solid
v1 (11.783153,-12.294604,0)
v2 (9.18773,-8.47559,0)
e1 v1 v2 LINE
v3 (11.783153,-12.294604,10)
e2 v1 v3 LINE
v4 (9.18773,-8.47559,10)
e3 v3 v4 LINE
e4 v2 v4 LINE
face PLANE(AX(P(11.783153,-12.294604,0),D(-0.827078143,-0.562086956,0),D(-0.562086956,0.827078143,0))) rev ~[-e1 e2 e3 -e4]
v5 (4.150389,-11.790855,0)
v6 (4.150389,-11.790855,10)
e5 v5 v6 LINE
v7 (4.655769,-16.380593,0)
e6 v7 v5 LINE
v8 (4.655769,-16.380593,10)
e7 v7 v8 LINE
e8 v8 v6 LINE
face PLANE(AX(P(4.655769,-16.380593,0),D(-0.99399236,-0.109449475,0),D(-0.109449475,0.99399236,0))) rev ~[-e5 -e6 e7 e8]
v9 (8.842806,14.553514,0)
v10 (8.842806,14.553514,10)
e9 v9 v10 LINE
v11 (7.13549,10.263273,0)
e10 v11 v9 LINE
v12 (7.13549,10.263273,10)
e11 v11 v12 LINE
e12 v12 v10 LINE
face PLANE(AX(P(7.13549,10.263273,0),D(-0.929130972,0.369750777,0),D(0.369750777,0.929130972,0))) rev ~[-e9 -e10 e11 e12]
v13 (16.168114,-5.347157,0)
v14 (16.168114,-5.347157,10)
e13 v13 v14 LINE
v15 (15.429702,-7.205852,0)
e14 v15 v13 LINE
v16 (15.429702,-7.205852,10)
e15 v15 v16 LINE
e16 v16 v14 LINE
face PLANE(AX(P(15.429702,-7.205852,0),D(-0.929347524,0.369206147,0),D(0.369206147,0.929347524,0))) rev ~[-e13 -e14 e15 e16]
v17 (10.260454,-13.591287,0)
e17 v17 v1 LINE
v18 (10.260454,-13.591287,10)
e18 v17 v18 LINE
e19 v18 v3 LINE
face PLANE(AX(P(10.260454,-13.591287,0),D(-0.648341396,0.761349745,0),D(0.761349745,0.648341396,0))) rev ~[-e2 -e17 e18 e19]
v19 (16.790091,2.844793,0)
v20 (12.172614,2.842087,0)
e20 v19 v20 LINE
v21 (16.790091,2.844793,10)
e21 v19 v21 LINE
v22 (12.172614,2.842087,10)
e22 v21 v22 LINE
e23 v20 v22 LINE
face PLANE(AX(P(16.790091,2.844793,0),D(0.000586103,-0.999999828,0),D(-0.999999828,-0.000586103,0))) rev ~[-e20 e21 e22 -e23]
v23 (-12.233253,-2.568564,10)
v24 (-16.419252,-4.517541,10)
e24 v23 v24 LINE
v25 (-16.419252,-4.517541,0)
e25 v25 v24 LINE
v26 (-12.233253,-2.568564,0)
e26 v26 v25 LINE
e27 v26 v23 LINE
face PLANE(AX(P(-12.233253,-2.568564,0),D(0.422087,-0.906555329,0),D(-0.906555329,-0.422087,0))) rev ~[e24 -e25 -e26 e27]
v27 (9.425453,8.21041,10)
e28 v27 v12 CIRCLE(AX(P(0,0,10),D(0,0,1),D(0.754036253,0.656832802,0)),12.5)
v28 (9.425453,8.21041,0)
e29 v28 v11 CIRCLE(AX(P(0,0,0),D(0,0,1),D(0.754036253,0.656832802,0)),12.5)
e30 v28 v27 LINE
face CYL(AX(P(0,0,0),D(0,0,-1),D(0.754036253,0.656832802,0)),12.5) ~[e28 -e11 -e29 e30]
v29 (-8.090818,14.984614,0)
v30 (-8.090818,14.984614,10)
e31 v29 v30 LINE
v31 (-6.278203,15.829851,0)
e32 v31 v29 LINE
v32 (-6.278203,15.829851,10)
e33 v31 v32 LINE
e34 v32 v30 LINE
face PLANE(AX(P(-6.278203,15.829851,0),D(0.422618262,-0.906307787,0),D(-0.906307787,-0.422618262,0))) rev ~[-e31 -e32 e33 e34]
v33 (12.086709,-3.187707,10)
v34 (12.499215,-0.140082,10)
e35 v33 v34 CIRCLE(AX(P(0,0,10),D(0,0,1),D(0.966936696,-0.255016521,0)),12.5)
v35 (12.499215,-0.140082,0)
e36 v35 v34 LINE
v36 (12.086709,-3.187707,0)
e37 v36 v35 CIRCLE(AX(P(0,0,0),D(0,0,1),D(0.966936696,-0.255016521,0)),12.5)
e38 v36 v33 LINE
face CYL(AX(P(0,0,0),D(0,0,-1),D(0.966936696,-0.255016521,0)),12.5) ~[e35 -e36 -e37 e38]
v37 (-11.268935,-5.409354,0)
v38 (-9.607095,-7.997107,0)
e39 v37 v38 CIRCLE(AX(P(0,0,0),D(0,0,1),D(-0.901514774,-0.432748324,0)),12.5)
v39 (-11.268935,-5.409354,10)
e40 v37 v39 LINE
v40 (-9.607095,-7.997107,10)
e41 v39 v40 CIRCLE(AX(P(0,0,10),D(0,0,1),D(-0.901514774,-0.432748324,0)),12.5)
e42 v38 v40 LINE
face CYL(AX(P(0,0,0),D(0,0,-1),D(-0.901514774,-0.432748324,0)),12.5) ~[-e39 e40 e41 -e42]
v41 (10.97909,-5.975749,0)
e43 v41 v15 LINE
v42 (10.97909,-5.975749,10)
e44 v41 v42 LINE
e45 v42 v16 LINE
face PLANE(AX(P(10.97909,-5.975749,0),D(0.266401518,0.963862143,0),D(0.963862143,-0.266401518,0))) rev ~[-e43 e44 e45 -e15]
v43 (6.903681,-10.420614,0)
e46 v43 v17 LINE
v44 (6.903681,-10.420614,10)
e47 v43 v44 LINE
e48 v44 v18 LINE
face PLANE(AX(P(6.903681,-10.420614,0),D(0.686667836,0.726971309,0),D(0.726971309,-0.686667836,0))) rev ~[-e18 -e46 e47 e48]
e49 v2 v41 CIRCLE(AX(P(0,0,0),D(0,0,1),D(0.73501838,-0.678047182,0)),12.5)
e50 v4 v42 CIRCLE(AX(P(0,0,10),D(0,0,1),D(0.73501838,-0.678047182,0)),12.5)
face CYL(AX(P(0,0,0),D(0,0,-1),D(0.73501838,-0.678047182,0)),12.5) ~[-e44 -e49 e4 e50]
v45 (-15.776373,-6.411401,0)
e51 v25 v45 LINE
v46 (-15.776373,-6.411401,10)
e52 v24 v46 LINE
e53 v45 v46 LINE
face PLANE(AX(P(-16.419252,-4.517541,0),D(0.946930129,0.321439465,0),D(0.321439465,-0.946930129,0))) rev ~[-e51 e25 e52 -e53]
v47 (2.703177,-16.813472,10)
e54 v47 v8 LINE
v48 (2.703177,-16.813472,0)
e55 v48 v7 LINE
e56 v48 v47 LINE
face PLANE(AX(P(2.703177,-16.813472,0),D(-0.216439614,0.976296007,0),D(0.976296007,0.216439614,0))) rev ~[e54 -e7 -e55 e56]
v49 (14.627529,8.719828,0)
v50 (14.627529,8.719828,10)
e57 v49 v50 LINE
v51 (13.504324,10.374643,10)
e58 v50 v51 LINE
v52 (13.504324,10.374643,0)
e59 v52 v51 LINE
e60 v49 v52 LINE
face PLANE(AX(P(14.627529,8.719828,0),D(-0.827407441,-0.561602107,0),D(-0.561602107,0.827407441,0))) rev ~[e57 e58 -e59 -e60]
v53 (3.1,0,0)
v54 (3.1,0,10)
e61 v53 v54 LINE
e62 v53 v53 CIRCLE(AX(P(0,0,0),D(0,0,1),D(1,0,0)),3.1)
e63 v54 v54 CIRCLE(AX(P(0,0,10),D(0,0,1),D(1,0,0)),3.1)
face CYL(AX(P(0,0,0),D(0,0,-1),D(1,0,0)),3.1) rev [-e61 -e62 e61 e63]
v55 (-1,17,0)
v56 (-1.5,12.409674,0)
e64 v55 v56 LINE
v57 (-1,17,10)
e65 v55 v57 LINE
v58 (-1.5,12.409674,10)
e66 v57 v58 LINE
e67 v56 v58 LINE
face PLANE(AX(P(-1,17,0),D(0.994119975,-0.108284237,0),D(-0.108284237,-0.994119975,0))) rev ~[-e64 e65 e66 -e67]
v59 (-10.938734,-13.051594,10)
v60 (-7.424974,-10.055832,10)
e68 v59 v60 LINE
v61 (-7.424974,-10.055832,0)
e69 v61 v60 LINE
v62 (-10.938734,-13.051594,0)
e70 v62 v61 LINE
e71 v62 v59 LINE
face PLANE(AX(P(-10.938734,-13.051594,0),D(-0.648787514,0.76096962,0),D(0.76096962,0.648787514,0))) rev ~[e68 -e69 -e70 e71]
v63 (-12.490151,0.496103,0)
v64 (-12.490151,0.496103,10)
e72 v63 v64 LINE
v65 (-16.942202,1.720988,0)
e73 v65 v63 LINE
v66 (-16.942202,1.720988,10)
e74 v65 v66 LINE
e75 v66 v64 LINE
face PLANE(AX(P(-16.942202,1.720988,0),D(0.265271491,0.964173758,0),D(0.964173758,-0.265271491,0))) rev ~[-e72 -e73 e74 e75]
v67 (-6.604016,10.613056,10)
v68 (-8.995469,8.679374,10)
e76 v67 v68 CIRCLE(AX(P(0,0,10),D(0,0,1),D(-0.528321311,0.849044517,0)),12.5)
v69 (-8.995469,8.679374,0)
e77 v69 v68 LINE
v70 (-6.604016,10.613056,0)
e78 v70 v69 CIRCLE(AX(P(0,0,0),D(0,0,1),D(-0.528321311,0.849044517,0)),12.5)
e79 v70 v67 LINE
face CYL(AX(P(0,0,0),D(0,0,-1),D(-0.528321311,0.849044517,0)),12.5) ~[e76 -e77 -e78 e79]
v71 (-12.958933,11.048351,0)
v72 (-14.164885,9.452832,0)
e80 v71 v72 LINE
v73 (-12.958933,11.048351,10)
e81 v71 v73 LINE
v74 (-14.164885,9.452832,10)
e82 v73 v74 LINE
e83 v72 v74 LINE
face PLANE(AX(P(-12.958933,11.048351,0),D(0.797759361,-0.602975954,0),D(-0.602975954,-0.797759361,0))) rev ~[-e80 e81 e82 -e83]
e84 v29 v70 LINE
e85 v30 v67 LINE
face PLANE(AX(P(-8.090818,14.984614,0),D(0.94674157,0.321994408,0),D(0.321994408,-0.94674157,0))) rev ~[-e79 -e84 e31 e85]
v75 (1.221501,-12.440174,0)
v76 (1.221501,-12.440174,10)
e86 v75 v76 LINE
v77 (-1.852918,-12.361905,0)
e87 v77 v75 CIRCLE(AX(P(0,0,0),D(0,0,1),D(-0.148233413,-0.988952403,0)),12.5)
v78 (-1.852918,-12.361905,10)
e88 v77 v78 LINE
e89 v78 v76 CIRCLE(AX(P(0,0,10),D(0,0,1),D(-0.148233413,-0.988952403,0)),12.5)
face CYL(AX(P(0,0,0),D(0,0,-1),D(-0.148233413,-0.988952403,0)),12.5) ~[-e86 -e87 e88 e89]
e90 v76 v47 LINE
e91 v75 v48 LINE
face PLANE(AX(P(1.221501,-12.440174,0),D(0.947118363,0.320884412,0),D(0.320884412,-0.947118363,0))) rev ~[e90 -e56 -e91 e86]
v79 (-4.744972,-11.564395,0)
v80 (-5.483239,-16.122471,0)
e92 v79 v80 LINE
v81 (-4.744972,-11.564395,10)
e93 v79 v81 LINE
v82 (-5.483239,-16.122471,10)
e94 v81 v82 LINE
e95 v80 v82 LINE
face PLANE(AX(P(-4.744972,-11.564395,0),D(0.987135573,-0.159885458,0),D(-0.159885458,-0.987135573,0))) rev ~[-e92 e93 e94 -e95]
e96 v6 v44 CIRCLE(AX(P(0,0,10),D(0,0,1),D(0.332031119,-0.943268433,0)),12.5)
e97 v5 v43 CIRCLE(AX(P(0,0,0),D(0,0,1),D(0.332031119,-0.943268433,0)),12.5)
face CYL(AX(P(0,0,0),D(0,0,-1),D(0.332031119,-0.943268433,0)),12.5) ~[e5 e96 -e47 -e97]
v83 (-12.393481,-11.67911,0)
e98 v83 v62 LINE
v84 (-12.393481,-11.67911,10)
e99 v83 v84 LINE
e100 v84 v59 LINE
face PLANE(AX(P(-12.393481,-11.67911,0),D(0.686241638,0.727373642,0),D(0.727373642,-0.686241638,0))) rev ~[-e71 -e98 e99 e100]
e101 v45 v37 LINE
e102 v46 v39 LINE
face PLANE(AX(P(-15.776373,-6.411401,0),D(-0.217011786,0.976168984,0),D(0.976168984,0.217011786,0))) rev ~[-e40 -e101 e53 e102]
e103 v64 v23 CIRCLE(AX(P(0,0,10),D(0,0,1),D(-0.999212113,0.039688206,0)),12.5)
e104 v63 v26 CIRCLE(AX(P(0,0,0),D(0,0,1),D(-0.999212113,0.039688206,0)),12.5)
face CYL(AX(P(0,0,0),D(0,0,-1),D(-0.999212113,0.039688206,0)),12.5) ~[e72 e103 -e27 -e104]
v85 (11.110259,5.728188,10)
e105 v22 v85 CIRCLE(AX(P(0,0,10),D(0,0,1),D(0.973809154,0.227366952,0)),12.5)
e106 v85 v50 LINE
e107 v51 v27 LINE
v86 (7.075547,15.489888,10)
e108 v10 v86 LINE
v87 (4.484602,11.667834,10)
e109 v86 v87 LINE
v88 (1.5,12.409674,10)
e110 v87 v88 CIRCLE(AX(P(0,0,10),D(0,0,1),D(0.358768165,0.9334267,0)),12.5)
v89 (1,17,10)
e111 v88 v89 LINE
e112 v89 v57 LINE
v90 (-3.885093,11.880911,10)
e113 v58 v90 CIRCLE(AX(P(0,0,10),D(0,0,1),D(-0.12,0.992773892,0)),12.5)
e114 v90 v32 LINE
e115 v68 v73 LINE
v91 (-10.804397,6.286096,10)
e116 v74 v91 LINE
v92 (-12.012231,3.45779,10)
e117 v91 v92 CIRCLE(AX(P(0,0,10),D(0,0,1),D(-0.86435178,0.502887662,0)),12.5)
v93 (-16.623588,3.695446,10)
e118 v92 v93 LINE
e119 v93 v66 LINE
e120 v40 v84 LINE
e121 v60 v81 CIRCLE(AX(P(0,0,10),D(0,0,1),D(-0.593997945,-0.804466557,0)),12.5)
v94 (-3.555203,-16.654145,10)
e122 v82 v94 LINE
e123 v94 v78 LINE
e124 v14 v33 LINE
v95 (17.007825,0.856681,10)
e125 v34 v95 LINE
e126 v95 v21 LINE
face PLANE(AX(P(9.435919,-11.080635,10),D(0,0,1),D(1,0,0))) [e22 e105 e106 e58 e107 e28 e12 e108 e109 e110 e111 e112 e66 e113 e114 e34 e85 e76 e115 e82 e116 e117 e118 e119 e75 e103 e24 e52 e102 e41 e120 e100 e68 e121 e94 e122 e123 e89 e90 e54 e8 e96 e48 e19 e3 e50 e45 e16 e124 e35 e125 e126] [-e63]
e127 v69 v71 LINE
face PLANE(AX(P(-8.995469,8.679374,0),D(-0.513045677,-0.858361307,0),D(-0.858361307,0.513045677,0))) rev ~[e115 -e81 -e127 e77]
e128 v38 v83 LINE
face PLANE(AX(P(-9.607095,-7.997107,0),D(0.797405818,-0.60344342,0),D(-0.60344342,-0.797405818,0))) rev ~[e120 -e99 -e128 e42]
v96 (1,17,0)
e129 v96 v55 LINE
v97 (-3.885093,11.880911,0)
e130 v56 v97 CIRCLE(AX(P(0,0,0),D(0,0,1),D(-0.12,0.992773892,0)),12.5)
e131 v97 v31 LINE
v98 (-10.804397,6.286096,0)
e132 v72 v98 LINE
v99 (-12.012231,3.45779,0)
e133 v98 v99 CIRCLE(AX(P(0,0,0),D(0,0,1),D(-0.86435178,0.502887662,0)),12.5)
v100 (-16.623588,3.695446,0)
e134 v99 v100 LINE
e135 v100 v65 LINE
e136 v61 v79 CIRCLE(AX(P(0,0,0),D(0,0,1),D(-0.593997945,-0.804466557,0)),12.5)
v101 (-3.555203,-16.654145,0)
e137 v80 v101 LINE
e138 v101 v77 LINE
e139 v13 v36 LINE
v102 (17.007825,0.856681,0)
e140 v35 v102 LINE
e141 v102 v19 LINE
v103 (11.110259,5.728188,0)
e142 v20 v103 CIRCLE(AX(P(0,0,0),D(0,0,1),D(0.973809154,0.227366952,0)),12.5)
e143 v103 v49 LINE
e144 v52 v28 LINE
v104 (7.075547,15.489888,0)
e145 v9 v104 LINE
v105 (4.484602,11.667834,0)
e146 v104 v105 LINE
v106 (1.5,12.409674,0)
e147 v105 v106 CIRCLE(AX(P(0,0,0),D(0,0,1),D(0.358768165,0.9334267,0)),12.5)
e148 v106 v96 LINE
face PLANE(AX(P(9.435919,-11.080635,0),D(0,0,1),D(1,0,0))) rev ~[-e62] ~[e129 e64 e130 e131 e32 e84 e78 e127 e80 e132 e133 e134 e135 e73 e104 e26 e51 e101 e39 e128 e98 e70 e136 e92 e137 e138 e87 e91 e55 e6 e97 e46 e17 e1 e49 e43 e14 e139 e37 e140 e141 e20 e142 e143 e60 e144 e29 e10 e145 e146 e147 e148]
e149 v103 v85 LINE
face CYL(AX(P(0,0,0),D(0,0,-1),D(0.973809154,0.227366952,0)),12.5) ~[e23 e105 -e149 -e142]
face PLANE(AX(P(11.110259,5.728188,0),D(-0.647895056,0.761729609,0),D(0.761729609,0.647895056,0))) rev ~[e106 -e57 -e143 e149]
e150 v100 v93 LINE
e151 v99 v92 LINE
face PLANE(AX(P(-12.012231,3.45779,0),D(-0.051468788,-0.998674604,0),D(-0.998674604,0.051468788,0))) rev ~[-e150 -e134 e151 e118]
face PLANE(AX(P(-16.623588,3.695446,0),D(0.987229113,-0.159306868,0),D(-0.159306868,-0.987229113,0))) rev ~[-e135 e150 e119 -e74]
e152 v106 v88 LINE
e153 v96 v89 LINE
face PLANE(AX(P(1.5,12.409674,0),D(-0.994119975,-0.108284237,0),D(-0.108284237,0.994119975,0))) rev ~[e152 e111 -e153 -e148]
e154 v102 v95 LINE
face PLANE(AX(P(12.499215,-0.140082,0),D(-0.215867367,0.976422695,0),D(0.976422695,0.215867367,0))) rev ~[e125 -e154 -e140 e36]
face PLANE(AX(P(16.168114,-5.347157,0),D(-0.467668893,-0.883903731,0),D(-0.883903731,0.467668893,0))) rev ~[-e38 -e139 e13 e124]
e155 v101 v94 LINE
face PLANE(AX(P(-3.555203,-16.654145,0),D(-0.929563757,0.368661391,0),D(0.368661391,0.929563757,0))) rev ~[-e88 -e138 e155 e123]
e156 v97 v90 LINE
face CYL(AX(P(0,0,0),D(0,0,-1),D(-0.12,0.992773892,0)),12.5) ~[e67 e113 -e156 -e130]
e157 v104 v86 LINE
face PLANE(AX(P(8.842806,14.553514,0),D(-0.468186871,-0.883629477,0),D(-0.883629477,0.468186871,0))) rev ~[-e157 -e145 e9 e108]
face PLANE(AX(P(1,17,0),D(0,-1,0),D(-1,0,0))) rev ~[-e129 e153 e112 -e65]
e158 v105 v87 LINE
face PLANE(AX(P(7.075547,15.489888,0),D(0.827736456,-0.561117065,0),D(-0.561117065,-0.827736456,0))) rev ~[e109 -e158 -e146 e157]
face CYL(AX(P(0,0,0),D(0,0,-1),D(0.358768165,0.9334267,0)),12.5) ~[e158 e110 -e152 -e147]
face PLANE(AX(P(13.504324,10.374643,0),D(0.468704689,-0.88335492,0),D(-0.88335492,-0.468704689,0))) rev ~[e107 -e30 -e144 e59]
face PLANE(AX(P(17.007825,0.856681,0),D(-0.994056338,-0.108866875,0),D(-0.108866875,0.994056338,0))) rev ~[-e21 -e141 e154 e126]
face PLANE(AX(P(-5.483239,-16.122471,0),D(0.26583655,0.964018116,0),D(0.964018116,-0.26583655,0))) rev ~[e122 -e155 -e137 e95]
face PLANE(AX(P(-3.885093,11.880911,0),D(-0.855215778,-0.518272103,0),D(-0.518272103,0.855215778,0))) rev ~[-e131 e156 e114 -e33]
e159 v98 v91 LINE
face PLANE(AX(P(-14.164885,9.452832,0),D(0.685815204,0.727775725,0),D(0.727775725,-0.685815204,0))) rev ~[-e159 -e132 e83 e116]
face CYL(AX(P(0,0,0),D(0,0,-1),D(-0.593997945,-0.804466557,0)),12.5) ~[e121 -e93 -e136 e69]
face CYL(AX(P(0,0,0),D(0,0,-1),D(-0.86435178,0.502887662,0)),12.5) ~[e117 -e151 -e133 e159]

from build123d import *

# Parameters (mm, degrees)
F0_R     = 3.1
F1_DEPTH = 10


# Not quite as in the source:
# - a feature names something its author has since deleted; it is built from what else it names


with BuildPart() as f1:
    # F0 (on Top) → F1 (new body)
    with BuildSketch(Plane.XY):
        with BuildLine():
            Line((11.7831534795, -12.2946042669), (9.1877297548, -8.4755897702))
            ThreePointArc((9.1877297548, -8.4755897702), (8.1042674519, -9.516871811), (6.9036805201, -10.4206139587))
            Line((6.9036805201, -10.4206139587), (10.2604539897, -13.5912870592))
            Line((10.2604539897, -13.5912870592), (11.7831534795, -12.2946042669))
        make_face()
        with BuildLine():
            ThreePointArc((9.4254531567, 8.2104100258), (10.3425930143, 7.0200263348), (11.110259477, 5.7281877024))
            Line((11.110259477, 5.7281877024), (14.6275286062, 8.7198283742))
            Line((14.6275286062, 8.7198283742), (13.5043243926, 10.3746432565))
            Line((13.5043243926, 10.3746432565), (9.4254531567, 8.2104100258))
        make_face()
        with BuildLine():
            Line((16.1681140592, -5.3471569801), (12.0867087003, -3.1877065099))
            ThreePointArc((12.0867087003, -3.1877065099), (11.6168440528, -4.6150768414), (10.9790902584, -5.9757490826))
            Line((10.9790902584, -5.9757490826), (15.4297017645, -7.2058520285))
            Line((15.4297017645, -7.2058520285), (16.1681140592, -5.3471569801))
        make_face()
        with BuildLine():
            ThreePointArc((-6.6040163856, 10.6130564673), (-5.2827282718, 11.328847338), (-3.8850930245, 11.8809112526))
            Line((-3.8850930245, 11.8809112526), (-6.2782026626, 15.8298506414))
            Line((-6.2782026626, 15.8298506414), (-8.0908182366, 14.9846141179))
            Line((-8.0908182366, 14.9846141179), (-6.6040163856, 10.6130564673))
        make_face()
        with BuildLine():
            Line((-10.9387342022, -13.0515935446), (-7.4249743059, -10.0558319674))
            ThreePointArc((-7.4249743059, -10.0558319674), (-8.5780204734, -9.0921705197), (-9.6070952306, -7.9971070538))
            Line((-9.6070952306, -7.9971070538), (-12.3934814853, -11.6791102689))
            Line((-12.3934814853, -11.6791102689), (-10.9387342022, -13.0515935446))
        make_face()
        with BuildLine():
            ThreePointArc((4.484602064, 11.6678337461), (5.8523358933, 11.0453684679), (7.1354904963, 10.2632731318))
            Line((7.1354904963, 10.2632731318), (8.8428062923, 14.5535142449))
            Line((8.8428062923, 14.5535142449), (7.0755473374, 15.4898879879))
            Line((7.0755473374, 15.4898879879), (4.484602064, 11.6678337461))
        make_face()
        with BuildLine():
            ThreePointArc((-10.8043972519, 6.2860957696), (-9.9719920146, 7.5371994308), (-8.9954693884, 8.6793738531))
            Line((-8.9954693884, 8.6793738531), (-12.9589331854, 11.0483505871))
            Line((-12.9589331854, 11.0483505871), (-14.1648850944, 9.4528318648))
            Line((-14.1648850944, 9.4528318648), (-10.8043972519, 6.2860957696))
        make_face()
        with BuildLine():
            Line((-3.5552032377, -16.6541445274), (-1.8529176571, -12.3619050375))
            ThreePointArc((-1.8529176571, -12.3619050375), (-3.3229568779, -12.0502264538), (-4.744972006, -11.5643953868))
            Line((-4.744972006, -11.5643953868), (-5.4832394703, -16.1224714269))
            Line((-5.4832394703, -16.1224714269), (-3.5552032377, -16.6541445274))
        make_face()
        with BuildLine():
            ThreePointArc((-12.4901514097, 0.4961025726), (-12.340363914, 1.9913358508), (-12.0122308055, 3.457789912))
            Line((-12.0122308055, 3.457789912), (-16.6235880549, 3.6954458703))
            Line((-16.6235880549, 3.6954458703), (-16.9422017911, 1.720987644))
            Line((-16.9422017911, 1.720987644), (-12.4901514097, 0.4961025726))
        make_face()
        with BuildLine():
            Line((-15.7763727361, -6.4114010396), (-11.2689346746, -5.4093540556))
            ThreePointArc((-11.2689346746, -5.4093540556), (-11.8366266187, -4.0179933163), (-12.2332530705, -2.5685636671))
            Line((-12.2332530705, -2.5685636671), (-16.4192516667, -4.5175407807))
            Line((-16.4192516667, -4.5175407807), (-15.7763727361, -6.4114010396))
        make_face()
        with BuildLine():
            ThreePointArc((12.1726144308, 2.8420868951), (12.4178838854, 1.4304404243), (12.5, 0))
            ThreePointArc((12.5, 0), (12.4998037623, -0.0700421594), (12.4992150553, -0.1400821196))
            Line((12.4992150553, -0.1400821196), (17.0078246246, 0.8566805343))
            Line((17.0078246246, 0.8566805343), (16.7900908749, 2.8447932107))
            Line((16.7900908749, 2.8447932107), (12.1726144308, 2.8420868951))
        make_face()
        with BuildLine():
            Line((4.6557694441, -16.3805925071), (4.1503889837, -11.7908554093))
            ThreePointArc((4.1503889837, -11.7908554093), (2.7054951742, -12.203700089), (1.2215009624, -12.4401742511))
            Line((1.2215009624, -12.4401742511), (2.7031774298, -16.813471735))
            Line((2.7031774298, -16.813471735), (4.6557694441, -16.3805925071))
        make_face()
        with BuildLine():
            ThreePointArc((-1.5, 12.409673646), (0, 12.5), (1.5, 12.409673646))
            Line((1.5, 12.409673646), (1, 17))
            Line((1, 17), (-1, 17))
            Line((-1, 17), (-1.5, 12.409673646))
        make_face()
        with BuildLine():
            ThreePointArc((-4.744972006, -11.5643953868), (-3.3229568779, -12.0502264538), (-1.8529176571, -12.3619050375))
            Line((-1.8529176571, -12.3619050375), (-4.744972006, -11.5643953868))
        make_face()
        with BuildLine():
            Line((4.484602064, 11.6678337461), (7.1354904963, 10.2632731318))
            ThreePointArc((7.1354904963, 10.2632731318), (5.8523358933, 11.0453684679), (4.484602064, 11.6678337461))
        make_face()
        with BuildLine():
            Line((-10.8043972519, 6.2860957696), (-8.9954693884, 8.6793738531))
            ThreePointArc((-8.9954693884, 8.6793738531), (-9.9719920146, 7.5371994308), (-10.8043972519, 6.2860957696))
        make_face()
        with BuildLine():
            ThreePointArc((-12.2332530705, -2.5685636671), (-11.8366266187, -4.0179933163), (-11.2689346746, -5.4093540556))
            Line((-11.2689346746, -5.4093540556), (-12.2332530705, -2.5685636671))
        make_face()
        with BuildLine():
            ThreePointArc((10.9790902584, -5.9757490826), (11.6168440528, -4.6150768414), (12.0867087003, -3.1877065099))
            Line((12.0867087003, -3.1877065099), (10.9790902584, -5.9757490826))
        make_face()
        with BuildLine():
            Line((-12.4901514097, 0.4961025726), (-12.0122308055, 3.457789912))
            ThreePointArc((-12.0122308055, 3.457789912), (-12.340363914, 1.9913358508), (-12.4901514097, 0.4961025726))
        make_face()
        with BuildLine():
            ThreePointArc((-9.6070952306, -7.9971070538), (-8.5780204734, -9.0921705197), (-7.4249743059, -10.0558319674))
            Line((-7.4249743059, -10.0558319674), (-9.6070952306, -7.9971070538))
        make_face()
        with BuildLine():
            ThreePointArc((12.4992150553, -0.1400821196), (12.4998037623, -0.0700421594), (12.5, 0))
            ThreePointArc((12.5, 0), (12.4178838854, 1.4304404243), (12.1726144308, 2.8420868951))
            Line((12.1726144308, 2.8420868951), (12.4992150553, -0.1400821196))
        make_face()
        with BuildLine():
            Line((-6.6040163856, 10.6130564673), (-3.8850930245, 11.8809112526))
            ThreePointArc((-3.8850930245, 11.8809112526), (-5.2827282718, 11.328847338), (-6.6040163856, 10.6130564673))
        make_face()
        with BuildLine():
            ThreePointArc((1.2215009624, -12.4401742511), (2.7054951742, -12.203700089), (4.1503889837, -11.7908554093))
            Line((4.1503889837, -11.7908554093), (1.2215009624, -12.4401742511))
        make_face()
        with BuildLine():
            Line((9.4254531567, 8.2104100258), (11.110259477, 5.7281877024))
            ThreePointArc((11.110259477, 5.7281877024), (10.3425930143, 7.0200263348), (9.4254531567, 8.2104100258))
        make_face()
        with BuildLine():
            ThreePointArc((6.9036805201, -10.4206139587), (8.1042674519, -9.516871811), (9.1877297548, -8.4755897702))
            Line((9.1877297548, -8.4755897702), (6.9036805201, -10.4206139587))
        make_face()
        with BuildLine():
            Line((-1.5, 12.409673646), (1.5, 12.409673646))
            ThreePointArc((1.5, 12.409673646), (0, 12.5), (-1.5, 12.409673646))
        make_face()
        with BuildLine():
            Line((12.4992150553, -0.1400821196), (12.1726144308, 2.8420868951))
            ThreePointArc((12.1726144308, 2.8420868951), (11.7305348906, 4.3179336703), (11.110259477, 5.7281877024))
            Line((11.110259477, 5.7281877024), (9.4254531567, 8.2104100258))
            ThreePointArc((9.4254531567, 8.2104100258), (8.3438465591, 9.3075359037), (7.1354904963, 10.2632731318))
            Line((7.1354904963, 10.2632731318), (4.484602064, 11.6678337461))
            ThreePointArc((4.484602064, 11.6678337461), (3.0152026591, 12.1308925032), (1.5, 12.409673646))
            Line((1.5, 12.409673646), (-1.5, 12.409673646))
            ThreePointArc((-1.5, 12.409673646), (-2.7054951742, 12.203700089), (-3.8850930245, 11.8809112526))
            Line((-3.8850930245, 11.8809112526), (-6.6040163856, 10.6130564673))
            ThreePointArc((-6.6040163856, 10.6130564673), (-7.8594383525, 9.7200426328), (-8.9954693884, 8.6793738531))
            Line((-8.9954693884, 8.6793738531), (-10.8043972519, 6.2860957696))
            ThreePointArc((-10.8043972519, 6.2860957696), (-11.4956277551, 4.9092303386), (-12.0122308055, 3.457789912))
            Line((-12.0122308055, 3.457789912), (-12.4901514097, 0.4961025726))
            ThreePointArc((-12.4901514097, 0.4961025726), (-12.4563127395, -1.0441613555), (-12.2332530705, -2.5685636671))
            Line((-12.2332530705, -2.5685636671), (-11.2689346746, -5.4093540556))
            ThreePointArc((-11.2689346746, -5.4093540556), (-10.5179024784, -6.7545338443), (-9.6070952306, -7.9971070538))
            Line((-9.6070952306, -7.9971070538), (-7.4249743059, -10.0558319674))
            ThreePointArc((-7.4249743059, -10.0558319674), (-6.131544602, -10.8928490669), (-4.744972006, -11.5643953868))
            Line((-4.744972006, -11.5643953868), (-1.8529176571, -12.3619050375))
            ThreePointArc((-1.8529176571, -12.3619050375), (-0.3181246266, -12.4959512132), (1.2215009624, -12.4401742511))
            Line((1.2215009624, -12.4401742511), (4.1503889837, -11.7908554093))
            ThreePointArc((4.1503889837, -11.7908554093), (5.5693360069, -11.1907326142), (6.9036805201, -10.4206139587))
            Line((6.9036805201, -10.4206139587), (9.1877297548, -8.4755897702))
            ThreePointArc((9.1877297548, -8.4755897702), (10.1605835574, -7.2809712108), (10.9790902584, -5.9757490826))
            Line((10.9790902584, -5.9757490826), (12.0867087003, -3.1877065099))
            ThreePointArc((12.0867087003, -3.1877065099), (12.3870462717, -1.6766289583), (12.4992150553, -0.1400821196))
        make_face()
        Circle(F0_R, mode=Mode.SUBTRACT)
    extrude(amount=F1_DEPTH)


solid = f1.part
